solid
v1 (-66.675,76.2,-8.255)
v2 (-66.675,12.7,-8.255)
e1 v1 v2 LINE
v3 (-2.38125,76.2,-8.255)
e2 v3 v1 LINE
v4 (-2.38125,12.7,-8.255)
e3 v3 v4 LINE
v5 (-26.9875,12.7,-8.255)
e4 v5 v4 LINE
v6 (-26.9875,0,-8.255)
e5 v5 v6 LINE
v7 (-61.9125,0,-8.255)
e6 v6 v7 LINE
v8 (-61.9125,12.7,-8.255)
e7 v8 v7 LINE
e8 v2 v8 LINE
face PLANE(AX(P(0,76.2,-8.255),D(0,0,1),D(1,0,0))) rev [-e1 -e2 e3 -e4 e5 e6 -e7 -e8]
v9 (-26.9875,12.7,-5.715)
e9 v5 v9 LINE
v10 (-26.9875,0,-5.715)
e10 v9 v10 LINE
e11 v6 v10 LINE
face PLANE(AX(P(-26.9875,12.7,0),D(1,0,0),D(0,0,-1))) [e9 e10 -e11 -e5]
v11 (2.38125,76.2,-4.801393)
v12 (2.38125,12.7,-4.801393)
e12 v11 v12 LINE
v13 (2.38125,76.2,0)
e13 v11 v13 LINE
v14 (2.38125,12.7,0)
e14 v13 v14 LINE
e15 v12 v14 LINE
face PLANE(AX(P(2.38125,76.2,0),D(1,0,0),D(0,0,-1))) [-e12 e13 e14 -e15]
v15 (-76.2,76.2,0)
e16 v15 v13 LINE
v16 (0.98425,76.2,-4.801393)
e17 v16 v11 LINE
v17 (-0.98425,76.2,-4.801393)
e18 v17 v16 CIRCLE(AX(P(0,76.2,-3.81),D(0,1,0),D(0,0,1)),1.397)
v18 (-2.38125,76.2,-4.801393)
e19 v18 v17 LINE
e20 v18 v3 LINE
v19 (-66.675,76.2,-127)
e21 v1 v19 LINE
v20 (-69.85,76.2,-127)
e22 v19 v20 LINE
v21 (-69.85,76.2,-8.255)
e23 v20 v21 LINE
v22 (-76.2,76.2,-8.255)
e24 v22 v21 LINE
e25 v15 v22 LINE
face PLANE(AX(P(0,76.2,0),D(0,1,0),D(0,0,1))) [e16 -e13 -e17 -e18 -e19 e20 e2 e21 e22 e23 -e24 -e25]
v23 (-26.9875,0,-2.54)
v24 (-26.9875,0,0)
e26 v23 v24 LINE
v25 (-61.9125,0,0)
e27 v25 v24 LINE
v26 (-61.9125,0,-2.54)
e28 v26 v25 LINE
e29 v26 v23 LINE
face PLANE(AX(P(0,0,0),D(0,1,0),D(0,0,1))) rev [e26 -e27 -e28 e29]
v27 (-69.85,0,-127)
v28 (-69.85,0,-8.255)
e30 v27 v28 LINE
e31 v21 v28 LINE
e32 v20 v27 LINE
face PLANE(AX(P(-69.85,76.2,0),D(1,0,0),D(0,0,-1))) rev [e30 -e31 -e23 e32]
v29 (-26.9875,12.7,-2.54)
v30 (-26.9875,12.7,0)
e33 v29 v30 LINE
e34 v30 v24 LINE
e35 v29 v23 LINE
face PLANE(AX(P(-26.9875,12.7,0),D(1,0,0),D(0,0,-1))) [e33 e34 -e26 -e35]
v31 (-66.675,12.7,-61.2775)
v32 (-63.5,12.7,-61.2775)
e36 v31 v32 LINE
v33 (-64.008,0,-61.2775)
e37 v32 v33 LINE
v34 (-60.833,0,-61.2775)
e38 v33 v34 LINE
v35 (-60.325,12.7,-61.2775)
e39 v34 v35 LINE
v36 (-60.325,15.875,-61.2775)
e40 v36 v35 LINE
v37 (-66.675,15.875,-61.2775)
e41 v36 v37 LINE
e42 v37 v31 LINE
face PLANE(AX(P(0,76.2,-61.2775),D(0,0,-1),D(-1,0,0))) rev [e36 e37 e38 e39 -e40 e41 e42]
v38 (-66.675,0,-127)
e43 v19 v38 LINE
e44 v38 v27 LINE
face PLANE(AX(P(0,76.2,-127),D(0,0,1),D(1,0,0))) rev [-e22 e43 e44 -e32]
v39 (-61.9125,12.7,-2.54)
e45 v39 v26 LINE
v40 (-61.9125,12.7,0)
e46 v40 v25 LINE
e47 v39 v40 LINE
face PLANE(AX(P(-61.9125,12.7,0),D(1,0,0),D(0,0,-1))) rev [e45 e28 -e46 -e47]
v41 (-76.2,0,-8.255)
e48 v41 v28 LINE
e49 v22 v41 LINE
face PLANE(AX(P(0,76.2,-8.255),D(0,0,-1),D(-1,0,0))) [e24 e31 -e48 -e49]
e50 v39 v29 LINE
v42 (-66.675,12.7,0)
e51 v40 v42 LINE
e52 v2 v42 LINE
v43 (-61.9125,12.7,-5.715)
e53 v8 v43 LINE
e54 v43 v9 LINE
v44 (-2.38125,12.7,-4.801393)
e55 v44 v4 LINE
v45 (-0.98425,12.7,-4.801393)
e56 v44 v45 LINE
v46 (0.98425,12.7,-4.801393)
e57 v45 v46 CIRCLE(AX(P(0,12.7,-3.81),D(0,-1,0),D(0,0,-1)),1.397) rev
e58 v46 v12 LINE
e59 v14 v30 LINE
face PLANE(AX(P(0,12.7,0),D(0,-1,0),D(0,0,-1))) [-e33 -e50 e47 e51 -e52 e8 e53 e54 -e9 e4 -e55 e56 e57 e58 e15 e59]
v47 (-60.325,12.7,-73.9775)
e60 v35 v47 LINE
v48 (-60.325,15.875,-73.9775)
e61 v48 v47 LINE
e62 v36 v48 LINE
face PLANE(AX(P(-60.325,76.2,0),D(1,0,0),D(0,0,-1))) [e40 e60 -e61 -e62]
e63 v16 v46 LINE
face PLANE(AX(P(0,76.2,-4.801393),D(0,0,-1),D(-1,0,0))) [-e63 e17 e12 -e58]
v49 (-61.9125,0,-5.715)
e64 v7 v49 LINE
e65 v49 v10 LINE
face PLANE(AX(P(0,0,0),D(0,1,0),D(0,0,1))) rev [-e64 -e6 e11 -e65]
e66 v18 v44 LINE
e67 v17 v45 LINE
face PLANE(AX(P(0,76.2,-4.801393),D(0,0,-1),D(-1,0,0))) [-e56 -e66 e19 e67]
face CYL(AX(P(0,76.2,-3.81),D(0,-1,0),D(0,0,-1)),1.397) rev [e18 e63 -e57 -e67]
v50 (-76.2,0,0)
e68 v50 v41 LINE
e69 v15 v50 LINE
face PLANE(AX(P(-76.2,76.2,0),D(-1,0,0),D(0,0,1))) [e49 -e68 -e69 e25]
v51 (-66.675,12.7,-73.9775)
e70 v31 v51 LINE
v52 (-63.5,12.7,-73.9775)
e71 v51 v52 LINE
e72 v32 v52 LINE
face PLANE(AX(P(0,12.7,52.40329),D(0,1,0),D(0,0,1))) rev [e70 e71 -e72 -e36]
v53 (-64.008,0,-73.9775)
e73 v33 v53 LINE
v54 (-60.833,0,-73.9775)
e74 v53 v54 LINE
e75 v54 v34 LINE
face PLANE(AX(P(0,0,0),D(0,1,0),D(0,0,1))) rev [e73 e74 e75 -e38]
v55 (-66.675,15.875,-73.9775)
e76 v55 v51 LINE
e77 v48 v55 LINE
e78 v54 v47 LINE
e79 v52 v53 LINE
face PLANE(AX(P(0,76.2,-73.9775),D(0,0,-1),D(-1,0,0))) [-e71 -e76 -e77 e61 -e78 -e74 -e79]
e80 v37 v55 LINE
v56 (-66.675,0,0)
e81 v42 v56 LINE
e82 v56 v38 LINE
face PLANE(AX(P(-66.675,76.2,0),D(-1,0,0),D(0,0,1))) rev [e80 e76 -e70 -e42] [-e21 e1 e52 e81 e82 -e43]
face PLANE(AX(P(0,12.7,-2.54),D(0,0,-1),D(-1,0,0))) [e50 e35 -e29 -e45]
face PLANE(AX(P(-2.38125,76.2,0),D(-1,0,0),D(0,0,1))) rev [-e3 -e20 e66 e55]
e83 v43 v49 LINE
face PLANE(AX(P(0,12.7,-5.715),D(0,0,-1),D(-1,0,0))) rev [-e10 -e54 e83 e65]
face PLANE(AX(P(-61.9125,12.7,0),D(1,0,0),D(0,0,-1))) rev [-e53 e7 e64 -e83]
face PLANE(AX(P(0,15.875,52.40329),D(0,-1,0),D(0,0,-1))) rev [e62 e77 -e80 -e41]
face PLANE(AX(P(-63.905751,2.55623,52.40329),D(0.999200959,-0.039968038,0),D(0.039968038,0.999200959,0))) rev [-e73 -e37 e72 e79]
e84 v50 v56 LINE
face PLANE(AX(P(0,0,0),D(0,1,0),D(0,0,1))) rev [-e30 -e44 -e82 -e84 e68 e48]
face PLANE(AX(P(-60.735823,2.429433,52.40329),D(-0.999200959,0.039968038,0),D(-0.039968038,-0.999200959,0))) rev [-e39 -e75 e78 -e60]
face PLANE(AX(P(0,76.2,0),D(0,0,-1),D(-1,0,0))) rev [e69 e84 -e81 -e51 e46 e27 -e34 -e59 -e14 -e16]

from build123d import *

# Parameters (mm, degrees)
BOSS_EXTRUDE1_DEPTH = 76.2
SKETCH9_W           = 6.35
SKETCH9_H           = 60.325
CUT_EXTRUDE1_DEPTH  = 65.7225
CUT_EXTRUDE2_DEPTH  = 12.7
LEFTCUT_DEPTH       = 76.2


# Read off the part's stored shape, not the designer's step: LeftCut
with BuildPart() as part:
    # Sketch8 → Boss-Extrude1 (new body)
    with BuildSketch(Plane(origin=(0, 0, 0), x_dir=(1, 0, 0), z_dir=(0, 1, 0))):
        Polygon((66.675, 8.255), (-66.675, 8.255), (-66.675, 61.2775), (-60.325, 61.2775), (-60.325, 73.9775), (-66.675, 73.9775), (-66.675, 127), (-69.85, 127), (-69.85, 8.255), (-76.2, 8.255), (-76.2, 0), (76.2, 0), (76.2, 8.255), (69.85, 8.255), (69.85, 127), (66.675, 127), (66.675, 73.9775), (60.325, 73.9775), (60.325, 61.2775), (66.675, 61.2775), align=None)
    extrude(amount=BOSS_EXTRUDE1_DEPTH)

    # Sketch9 → Cut-Extrude1 (cut)
    with BuildSketch(Plane(origin=(0, 0, -73.9775), x_dir=(-1, 0, 0), z_dir=(0, 0, -1))):
        Polygon((-66.675, 12.7), (-66.675, 0), (-64.008, 0), (-63.5, 12.7), align=None)
        Polygon((66.675, 12.7), (63.5, 12.7), (64.008, 0), (66.675, 0), align=None)
        with Locations((-63.5, 46.0375)):
            Rectangle(SKETCH9_W, SKETCH9_H)
        Polygon((-60.325, 0), (-60.325, 12.7), (-60.833, 0), align=None)
        Polygon((-60.198, 15.875), (-60.325, 15.875), (-60.325, 12.7), align=None)
        Polygon((60.833, 0), (60.325, 12.7), (60.325, 0), align=None)
        Polygon((60.325, 12.7), (60.325, 15.875), (60.198, 15.875), align=None)
        with Locations((63.5, 46.0375)):
            Rectangle(SKETCH9_W, SKETCH9_H)
    extrude(amount=-CUT_EXTRUDE1_DEPTH, mode=Mode.SUBTRACT)

    # Sketch10 → Cut-Extrude2 (cut)
    with BuildSketch(Plane.XZ):
        Polygon((26.9875, -5.715), (61.9125, -5.715), (61.9125, -8.255), (66.675, -8.255), (66.675, 0), (61.9125, 0), (61.9125, -2.54), (26.9875, -2.54), (26.9875, 0), (-26.9875, 0), (-26.9875, -2.54), (-61.9125, -2.54), (-61.9125, 0), (-66.675, 0), (-66.675, -8.255), (-61.9125, -8.255), (-61.9125, -5.715), (-26.9875, -5.715), (-26.9875, -8.255), (26.9875, -8.255), align=None)
    extrude(amount=-CUT_EXTRUDE2_DEPTH, mode=Mode.SUBTRACT)

    # LeftCut outline → LeftCut (cut)
    with BuildSketch(Plane(origin=(0, 0, 0), x_dir=(1, 0, 0), z_dir=(0, 1, 0))):
        with BuildLine():
            ThreePointArc((-0.98425, 4.801393432), (0, 2.413), (0.98425, 4.801393432))
            Line((0.98425, 4.801393432), (2.38125, 4.801393432))
            Line((2.38125, 4.801393432), (2.38125, 0))
            Line((2.38125, 0), (76.2, 0))
            Line((76.2, 0), (76.2, 8.255))
            Line((76.2, 8.255), (69.85, 8.255))
            Line((69.85, 8.255), (69.85, 127))
            Line((69.85, 127), (66.675, 127))
            Line((66.675, 127), (66.675, 73.9775))
            Line((66.675, 73.9775), (60.325, 73.9775))
            Line((60.325, 73.9775), (60.325, 61.2775))
            Line((60.325, 61.2775), (66.675, 61.2775))
            Line((66.675, 61.2775), (66.675, 8.255))
            Line((66.675, 8.255), (-2.38125, 8.255))
            Line((-2.38125, 8.255), (-2.38125, 4.801393432))
            Line((-2.38125, 4.801393432), (-0.98425, 4.801393432))
        make_face()
    extrude(amount=LEFTCUT_DEPTH, mode=Mode.SUBTRACT)


solid = part.part
